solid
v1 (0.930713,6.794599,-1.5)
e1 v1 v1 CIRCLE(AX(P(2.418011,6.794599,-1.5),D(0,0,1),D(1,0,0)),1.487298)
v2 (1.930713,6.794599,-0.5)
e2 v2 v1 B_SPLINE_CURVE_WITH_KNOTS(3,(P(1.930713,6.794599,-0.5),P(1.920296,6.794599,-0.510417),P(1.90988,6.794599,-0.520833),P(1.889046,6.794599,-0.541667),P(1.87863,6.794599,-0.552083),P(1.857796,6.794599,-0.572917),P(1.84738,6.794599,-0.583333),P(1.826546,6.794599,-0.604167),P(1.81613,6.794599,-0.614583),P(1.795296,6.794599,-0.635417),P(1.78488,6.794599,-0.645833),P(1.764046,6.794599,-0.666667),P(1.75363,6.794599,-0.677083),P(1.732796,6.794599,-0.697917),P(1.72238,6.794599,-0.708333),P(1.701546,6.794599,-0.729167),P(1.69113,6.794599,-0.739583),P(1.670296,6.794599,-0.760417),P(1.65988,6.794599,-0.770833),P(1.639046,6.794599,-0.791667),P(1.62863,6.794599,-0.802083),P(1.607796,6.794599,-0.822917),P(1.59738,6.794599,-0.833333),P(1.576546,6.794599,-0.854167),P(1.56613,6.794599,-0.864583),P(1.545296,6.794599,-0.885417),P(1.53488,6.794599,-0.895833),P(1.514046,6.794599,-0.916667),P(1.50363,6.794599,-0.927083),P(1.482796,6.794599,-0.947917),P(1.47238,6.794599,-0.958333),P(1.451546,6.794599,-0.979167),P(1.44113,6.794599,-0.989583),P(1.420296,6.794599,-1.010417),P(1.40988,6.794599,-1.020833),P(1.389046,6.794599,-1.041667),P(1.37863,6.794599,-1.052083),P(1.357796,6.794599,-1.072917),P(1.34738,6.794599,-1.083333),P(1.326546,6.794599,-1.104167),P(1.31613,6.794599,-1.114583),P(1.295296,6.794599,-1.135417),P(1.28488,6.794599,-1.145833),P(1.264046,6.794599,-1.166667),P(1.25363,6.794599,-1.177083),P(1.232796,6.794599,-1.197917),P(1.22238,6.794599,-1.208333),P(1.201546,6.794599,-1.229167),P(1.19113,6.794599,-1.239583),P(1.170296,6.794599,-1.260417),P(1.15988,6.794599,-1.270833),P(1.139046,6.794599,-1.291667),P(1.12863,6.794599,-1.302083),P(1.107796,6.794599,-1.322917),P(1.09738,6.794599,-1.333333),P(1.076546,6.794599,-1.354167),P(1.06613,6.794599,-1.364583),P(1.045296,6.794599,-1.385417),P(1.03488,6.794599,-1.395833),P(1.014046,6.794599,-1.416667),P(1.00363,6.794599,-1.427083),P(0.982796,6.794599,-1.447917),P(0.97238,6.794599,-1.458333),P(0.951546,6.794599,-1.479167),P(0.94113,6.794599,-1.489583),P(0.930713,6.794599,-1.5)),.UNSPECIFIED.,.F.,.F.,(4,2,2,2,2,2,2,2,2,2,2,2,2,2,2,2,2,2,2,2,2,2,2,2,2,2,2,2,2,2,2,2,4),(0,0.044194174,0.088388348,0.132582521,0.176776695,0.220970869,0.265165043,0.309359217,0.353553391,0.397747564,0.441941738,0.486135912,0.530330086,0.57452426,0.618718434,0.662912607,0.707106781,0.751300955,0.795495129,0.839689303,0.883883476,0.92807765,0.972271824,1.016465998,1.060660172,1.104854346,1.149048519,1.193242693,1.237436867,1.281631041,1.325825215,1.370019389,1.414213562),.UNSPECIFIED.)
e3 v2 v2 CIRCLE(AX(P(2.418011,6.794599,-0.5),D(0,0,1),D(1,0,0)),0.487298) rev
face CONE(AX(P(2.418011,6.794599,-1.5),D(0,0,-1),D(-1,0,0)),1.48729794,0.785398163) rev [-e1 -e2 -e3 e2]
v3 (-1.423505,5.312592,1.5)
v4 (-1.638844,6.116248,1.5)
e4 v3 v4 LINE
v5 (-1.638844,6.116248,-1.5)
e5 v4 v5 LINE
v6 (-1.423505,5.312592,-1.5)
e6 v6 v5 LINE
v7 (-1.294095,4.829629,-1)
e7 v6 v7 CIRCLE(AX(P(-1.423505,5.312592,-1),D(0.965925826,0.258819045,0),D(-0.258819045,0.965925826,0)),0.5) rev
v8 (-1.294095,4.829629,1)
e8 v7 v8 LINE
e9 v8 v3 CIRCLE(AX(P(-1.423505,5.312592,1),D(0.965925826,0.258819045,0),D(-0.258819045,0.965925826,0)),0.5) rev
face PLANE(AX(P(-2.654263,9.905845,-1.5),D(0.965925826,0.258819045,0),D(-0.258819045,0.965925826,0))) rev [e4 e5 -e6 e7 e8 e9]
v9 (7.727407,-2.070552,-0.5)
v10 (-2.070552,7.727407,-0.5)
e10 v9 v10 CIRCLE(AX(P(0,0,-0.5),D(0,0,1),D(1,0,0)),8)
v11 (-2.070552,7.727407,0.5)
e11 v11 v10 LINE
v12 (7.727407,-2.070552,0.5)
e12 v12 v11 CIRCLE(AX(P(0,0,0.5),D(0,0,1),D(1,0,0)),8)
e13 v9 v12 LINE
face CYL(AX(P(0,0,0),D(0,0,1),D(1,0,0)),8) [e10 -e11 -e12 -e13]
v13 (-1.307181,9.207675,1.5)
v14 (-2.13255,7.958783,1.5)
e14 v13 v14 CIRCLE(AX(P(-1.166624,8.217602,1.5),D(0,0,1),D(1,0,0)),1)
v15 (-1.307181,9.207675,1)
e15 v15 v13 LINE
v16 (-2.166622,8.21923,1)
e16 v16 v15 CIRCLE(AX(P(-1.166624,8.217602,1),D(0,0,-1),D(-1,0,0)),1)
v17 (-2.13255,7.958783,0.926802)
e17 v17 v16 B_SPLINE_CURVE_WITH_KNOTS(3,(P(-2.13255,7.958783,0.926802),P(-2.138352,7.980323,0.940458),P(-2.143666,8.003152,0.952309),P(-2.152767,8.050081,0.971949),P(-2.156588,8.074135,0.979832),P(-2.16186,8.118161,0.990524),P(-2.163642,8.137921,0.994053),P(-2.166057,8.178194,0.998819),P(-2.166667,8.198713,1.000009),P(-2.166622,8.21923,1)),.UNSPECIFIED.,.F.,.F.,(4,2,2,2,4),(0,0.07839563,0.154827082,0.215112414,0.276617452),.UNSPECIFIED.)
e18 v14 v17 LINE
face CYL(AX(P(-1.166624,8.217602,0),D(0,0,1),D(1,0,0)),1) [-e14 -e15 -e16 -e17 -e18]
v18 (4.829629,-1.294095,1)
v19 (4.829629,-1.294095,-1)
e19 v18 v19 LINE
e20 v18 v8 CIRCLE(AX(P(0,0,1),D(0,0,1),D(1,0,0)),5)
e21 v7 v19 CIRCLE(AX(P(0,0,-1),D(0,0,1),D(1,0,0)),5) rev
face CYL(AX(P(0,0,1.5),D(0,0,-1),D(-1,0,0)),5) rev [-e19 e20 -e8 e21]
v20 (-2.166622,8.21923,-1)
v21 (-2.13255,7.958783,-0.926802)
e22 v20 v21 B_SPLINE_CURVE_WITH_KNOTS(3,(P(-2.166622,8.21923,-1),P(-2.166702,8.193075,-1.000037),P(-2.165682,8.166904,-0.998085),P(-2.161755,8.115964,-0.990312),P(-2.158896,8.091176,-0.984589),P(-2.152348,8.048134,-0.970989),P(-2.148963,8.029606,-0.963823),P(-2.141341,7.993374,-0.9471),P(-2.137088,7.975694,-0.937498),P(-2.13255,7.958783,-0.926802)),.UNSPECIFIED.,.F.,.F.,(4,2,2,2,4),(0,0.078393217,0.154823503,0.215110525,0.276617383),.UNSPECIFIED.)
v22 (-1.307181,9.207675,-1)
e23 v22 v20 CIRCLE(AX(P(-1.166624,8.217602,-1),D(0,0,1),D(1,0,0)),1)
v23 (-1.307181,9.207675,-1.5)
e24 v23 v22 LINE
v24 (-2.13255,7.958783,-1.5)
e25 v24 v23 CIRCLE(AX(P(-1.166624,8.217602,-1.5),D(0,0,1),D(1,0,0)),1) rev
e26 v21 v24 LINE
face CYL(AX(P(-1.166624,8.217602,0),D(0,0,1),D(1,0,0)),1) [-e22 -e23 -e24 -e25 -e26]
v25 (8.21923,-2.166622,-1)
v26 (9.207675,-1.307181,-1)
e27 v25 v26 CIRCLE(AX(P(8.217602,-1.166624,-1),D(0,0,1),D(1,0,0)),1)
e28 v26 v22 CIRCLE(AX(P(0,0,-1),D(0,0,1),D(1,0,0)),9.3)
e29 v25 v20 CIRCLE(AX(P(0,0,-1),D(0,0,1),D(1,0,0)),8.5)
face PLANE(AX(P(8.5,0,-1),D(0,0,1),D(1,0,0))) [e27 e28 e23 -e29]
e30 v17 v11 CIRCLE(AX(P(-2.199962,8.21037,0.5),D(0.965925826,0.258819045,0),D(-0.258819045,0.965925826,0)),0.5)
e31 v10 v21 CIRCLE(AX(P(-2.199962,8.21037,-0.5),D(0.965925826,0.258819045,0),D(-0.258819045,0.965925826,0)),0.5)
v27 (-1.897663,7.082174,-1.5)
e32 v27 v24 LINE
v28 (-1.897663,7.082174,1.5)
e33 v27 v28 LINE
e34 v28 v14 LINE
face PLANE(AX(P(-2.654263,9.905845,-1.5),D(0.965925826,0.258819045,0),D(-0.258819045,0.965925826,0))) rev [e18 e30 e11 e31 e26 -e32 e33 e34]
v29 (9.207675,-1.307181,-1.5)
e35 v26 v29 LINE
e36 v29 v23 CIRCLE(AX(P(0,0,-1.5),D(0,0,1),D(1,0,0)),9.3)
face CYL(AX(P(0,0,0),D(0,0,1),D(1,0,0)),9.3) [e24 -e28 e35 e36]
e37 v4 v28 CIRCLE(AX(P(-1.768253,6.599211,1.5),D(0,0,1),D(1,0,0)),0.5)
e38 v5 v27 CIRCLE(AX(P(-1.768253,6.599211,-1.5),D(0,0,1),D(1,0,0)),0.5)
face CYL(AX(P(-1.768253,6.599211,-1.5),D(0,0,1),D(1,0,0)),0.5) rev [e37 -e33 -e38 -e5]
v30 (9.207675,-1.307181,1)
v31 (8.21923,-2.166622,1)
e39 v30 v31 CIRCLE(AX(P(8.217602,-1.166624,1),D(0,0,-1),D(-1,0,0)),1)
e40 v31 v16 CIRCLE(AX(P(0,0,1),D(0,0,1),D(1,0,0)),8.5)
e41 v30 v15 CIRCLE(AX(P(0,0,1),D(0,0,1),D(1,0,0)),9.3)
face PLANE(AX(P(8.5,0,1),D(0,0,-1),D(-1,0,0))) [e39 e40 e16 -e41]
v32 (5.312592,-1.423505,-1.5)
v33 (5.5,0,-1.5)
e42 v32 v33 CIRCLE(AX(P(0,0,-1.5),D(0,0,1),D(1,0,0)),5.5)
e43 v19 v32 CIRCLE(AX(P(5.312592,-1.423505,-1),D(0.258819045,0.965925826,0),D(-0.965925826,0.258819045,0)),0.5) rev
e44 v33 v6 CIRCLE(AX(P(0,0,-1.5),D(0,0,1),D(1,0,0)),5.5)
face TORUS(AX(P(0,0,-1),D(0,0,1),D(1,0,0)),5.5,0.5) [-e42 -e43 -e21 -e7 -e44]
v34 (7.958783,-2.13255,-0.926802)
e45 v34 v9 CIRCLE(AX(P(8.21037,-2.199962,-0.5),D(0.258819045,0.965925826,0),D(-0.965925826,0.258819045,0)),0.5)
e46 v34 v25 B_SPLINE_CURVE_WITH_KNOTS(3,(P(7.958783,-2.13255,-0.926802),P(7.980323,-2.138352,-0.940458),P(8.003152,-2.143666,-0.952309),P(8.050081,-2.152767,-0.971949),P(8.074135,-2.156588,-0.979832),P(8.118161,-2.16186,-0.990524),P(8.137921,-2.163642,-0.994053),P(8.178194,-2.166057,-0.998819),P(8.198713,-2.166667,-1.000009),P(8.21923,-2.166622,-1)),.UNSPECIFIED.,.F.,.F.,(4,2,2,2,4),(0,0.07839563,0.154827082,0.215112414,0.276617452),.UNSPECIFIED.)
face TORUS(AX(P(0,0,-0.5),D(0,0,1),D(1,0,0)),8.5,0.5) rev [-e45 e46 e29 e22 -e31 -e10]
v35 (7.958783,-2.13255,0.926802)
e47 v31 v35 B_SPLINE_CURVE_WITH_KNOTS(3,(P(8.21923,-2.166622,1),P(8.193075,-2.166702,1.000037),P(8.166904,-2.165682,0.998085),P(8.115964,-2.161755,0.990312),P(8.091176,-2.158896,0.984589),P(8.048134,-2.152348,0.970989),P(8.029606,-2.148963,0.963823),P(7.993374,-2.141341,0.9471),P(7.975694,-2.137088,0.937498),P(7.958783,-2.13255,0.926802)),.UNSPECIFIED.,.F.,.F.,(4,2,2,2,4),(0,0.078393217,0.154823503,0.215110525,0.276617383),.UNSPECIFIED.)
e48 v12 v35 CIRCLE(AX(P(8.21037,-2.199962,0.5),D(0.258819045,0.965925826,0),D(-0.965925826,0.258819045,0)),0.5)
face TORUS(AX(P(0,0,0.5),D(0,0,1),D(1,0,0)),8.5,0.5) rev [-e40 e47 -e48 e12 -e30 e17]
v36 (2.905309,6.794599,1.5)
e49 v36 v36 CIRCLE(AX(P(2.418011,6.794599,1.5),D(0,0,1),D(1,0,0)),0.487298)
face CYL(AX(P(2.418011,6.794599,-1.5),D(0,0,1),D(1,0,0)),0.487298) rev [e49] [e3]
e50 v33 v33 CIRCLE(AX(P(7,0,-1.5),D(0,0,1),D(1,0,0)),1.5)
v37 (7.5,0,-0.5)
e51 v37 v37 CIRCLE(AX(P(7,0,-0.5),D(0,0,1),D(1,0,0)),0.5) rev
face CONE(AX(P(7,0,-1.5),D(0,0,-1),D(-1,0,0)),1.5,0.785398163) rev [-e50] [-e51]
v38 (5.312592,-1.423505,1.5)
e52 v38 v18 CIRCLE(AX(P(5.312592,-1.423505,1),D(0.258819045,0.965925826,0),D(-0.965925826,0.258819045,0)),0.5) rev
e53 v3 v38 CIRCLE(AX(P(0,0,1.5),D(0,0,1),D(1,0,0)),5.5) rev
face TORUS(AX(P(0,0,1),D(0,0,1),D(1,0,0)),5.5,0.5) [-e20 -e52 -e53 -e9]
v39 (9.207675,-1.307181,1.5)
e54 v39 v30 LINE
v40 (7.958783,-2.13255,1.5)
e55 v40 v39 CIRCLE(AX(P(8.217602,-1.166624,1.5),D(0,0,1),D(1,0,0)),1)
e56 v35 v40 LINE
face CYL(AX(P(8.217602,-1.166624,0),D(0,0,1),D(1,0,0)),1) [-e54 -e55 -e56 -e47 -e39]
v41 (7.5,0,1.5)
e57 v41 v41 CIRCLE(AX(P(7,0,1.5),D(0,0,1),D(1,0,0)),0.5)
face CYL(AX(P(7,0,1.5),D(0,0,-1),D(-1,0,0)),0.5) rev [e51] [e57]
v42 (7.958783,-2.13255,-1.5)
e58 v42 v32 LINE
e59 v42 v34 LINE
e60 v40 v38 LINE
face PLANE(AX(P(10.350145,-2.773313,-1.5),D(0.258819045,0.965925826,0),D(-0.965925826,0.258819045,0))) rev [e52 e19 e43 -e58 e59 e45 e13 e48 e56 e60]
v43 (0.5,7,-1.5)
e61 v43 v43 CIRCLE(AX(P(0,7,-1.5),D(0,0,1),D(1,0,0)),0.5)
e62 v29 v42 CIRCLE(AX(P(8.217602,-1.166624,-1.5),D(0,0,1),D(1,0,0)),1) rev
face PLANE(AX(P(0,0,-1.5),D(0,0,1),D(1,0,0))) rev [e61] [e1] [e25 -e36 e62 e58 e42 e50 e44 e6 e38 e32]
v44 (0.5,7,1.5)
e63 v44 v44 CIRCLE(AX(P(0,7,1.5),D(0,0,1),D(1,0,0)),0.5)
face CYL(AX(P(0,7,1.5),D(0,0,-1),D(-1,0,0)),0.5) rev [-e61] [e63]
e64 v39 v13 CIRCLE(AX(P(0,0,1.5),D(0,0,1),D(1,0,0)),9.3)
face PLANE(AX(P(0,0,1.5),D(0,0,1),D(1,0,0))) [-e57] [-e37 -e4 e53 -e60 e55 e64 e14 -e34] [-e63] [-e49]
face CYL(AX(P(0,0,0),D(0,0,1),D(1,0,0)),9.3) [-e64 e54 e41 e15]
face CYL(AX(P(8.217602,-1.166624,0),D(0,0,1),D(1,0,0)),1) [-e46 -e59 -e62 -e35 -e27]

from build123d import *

# Parameters (mm, degrees)
SKETCH1_R               = 8.5
SKETCH1_R_2             = 0.5
SKETCH1_R_3             = 5
BOSS_EXTRUDE1_DEPTH     = 1.5
SKETCH7_W               = 0.8
SKETCH7_H               = 0.5
CUT_EXTRUDE1_DEPTH      = 14.237446884
CUT_EXTRUDE1_DEPTH_BACK = 14.237446884
CUT_EXTRUDE2_DEPTH      = 14.489996294
CUT_EXTRUDE2_DEPTH_BACK = 14.489996294
SKETCH5_R               = 0.5
SKETCH5_R_2             = 0.48729794
FILLET1_R               = 0.5
FILLET2_R               = 1
CHAMFER1_SIZE           = 1


with BuildPart() as part:
    # Sketch1 → Boss-Extrude1 (new, symmetric)
    with BuildSketch(Plane.XY):
        Circle(SKETCH1_R)
        with Locations((7, 0)):
            Circle(SKETCH1_R_2, mode=Mode.SUBTRACT)
        Circle(SKETCH1_R_3, mode=Mode.SUBTRACT)
        with Locations((0, -7)):
            Circle(SKETCH1_R_2, mode=Mode.SUBTRACT)
        with Locations((-7, 0)):
            Circle(SKETCH1_R_2, mode=Mode.SUBTRACT)
        with Locations((0, 7)):
            Circle(SKETCH1_R_2, mode=Mode.SUBTRACT)
    extrude(amount=BOSS_EXTRUDE1_DEPTH, both=True)

    # Sketch2 → Cut-Revolve1 (revolve, cut)
    with BuildSketch(Plane(origin=(0, 0, 0), x_dir=(1, 0, 0), z_dir=(0, 1, 0)), mode=Mode.PRIVATE) as cut_revolve1_sk:
        with BuildLine():
            Line((-8, 0.5), (-8, -0.5))
            ThreePointArc((-8, -0.5), (-8.146446609, -0.853553391), (-8.5, -1))
            Line((-8.5, -1), (-8.5, 1))
            ThreePointArc((-8.5, 1), (-8.146446609, 0.853553391), (-8, 0.5))
        make_face()
    revolve(cut_revolve1_sk.sketch.rotate(Axis((0, 0, 0), (0, 0, -1)), 180), axis=Axis((0, 0, 0), (0, 0, -1)), mode=Mode.SUBTRACT)

    # Sketch7 → Revolve1 (revolve)
    with BuildSketch(Plane(origin=(0, 0, 0), x_dir=(1, 0, 0), z_dir=(0, 1, 0))):
        with Locations((8.9, 1.25)):
            Rectangle(SKETCH7_W, SKETCH7_H)
        with Locations((8.9, -1.25)):
            Rectangle(SKETCH7_W, SKETCH7_H)
    revolve(axis=Axis((0, 0, 0), (0, 0, -1)))

    # Sketch4 → Cut-Extrude1 (cut, two sides: drawn at the far end of the back side and taken through both)
    with BuildSketch(Plane.XY.offset(-CUT_EXTRUDE1_DEPTH_BACK)):
        Polygon((-2.654263152, 9.905844942), (0, 0), (10.350145374, -2.773313095), (10.350145374, -11.033622271), (-11.334173843, -11.033622271), (-11.334173843, 9.905844942), align=None)
    extrude(amount=CUT_EXTRUDE1_DEPTH + CUT_EXTRUDE1_DEPTH_BACK, mode=Mode.SUBTRACT)

    # Sketch5 → Cut-Extrude2 (cut, two sides: drawn at the far end of the back side and taken through both)
    with BuildSketch(Plane.XY.offset(1.5).offset(-CUT_EXTRUDE2_DEPTH_BACK)):
        with Locations((-1.768253171, 6.599210675)):
            Circle(SKETCH5_R)
        with Locations((2.418011057, 6.794599377)):
            Circle(SKETCH5_R_2)
    extrude(amount=CUT_EXTRUDE2_DEPTH + CUT_EXTRUDE2_DEPTH_BACK, mode=Mode.SUBTRACT)

    # Fillet1
    fillet1_edges = [part.edges().sort_by_distance(p)[0] for p in [
        (3.535533906, 3.535533906, 1.5),
        (3.535533906, 3.535533906, -1.5),
    ]]
    fillet(fillet1_edges, radius=FILLET1_R)

    # Fillet2
    fillet2_edges = [part.edges().sort_by_distance(p)[0] for p in [
        (8.983110184, -2.407017119, -1.25),
        (8.983110184, -2.407017119, 1.25),
        (-2.407017119, 8.983110184, -1.25),
        (-2.407017119, 8.983110184, 1.25),
    ]]
    fillet(fillet2_edges, radius=FILLET2_R)

    # Chamfer1
    chamfer1_edges = [part.edges().sort_by_distance(p)[0] for p in [
        (6.5, 0, -1.5),
        (1.930713118, 6.794599377, -1.5),
    ]]
    chamfer(chamfer1_edges, length=CHAMFER1_SIZE - 0.0001)  # a hair under: the kernel refuses the full size


solid = part.part
